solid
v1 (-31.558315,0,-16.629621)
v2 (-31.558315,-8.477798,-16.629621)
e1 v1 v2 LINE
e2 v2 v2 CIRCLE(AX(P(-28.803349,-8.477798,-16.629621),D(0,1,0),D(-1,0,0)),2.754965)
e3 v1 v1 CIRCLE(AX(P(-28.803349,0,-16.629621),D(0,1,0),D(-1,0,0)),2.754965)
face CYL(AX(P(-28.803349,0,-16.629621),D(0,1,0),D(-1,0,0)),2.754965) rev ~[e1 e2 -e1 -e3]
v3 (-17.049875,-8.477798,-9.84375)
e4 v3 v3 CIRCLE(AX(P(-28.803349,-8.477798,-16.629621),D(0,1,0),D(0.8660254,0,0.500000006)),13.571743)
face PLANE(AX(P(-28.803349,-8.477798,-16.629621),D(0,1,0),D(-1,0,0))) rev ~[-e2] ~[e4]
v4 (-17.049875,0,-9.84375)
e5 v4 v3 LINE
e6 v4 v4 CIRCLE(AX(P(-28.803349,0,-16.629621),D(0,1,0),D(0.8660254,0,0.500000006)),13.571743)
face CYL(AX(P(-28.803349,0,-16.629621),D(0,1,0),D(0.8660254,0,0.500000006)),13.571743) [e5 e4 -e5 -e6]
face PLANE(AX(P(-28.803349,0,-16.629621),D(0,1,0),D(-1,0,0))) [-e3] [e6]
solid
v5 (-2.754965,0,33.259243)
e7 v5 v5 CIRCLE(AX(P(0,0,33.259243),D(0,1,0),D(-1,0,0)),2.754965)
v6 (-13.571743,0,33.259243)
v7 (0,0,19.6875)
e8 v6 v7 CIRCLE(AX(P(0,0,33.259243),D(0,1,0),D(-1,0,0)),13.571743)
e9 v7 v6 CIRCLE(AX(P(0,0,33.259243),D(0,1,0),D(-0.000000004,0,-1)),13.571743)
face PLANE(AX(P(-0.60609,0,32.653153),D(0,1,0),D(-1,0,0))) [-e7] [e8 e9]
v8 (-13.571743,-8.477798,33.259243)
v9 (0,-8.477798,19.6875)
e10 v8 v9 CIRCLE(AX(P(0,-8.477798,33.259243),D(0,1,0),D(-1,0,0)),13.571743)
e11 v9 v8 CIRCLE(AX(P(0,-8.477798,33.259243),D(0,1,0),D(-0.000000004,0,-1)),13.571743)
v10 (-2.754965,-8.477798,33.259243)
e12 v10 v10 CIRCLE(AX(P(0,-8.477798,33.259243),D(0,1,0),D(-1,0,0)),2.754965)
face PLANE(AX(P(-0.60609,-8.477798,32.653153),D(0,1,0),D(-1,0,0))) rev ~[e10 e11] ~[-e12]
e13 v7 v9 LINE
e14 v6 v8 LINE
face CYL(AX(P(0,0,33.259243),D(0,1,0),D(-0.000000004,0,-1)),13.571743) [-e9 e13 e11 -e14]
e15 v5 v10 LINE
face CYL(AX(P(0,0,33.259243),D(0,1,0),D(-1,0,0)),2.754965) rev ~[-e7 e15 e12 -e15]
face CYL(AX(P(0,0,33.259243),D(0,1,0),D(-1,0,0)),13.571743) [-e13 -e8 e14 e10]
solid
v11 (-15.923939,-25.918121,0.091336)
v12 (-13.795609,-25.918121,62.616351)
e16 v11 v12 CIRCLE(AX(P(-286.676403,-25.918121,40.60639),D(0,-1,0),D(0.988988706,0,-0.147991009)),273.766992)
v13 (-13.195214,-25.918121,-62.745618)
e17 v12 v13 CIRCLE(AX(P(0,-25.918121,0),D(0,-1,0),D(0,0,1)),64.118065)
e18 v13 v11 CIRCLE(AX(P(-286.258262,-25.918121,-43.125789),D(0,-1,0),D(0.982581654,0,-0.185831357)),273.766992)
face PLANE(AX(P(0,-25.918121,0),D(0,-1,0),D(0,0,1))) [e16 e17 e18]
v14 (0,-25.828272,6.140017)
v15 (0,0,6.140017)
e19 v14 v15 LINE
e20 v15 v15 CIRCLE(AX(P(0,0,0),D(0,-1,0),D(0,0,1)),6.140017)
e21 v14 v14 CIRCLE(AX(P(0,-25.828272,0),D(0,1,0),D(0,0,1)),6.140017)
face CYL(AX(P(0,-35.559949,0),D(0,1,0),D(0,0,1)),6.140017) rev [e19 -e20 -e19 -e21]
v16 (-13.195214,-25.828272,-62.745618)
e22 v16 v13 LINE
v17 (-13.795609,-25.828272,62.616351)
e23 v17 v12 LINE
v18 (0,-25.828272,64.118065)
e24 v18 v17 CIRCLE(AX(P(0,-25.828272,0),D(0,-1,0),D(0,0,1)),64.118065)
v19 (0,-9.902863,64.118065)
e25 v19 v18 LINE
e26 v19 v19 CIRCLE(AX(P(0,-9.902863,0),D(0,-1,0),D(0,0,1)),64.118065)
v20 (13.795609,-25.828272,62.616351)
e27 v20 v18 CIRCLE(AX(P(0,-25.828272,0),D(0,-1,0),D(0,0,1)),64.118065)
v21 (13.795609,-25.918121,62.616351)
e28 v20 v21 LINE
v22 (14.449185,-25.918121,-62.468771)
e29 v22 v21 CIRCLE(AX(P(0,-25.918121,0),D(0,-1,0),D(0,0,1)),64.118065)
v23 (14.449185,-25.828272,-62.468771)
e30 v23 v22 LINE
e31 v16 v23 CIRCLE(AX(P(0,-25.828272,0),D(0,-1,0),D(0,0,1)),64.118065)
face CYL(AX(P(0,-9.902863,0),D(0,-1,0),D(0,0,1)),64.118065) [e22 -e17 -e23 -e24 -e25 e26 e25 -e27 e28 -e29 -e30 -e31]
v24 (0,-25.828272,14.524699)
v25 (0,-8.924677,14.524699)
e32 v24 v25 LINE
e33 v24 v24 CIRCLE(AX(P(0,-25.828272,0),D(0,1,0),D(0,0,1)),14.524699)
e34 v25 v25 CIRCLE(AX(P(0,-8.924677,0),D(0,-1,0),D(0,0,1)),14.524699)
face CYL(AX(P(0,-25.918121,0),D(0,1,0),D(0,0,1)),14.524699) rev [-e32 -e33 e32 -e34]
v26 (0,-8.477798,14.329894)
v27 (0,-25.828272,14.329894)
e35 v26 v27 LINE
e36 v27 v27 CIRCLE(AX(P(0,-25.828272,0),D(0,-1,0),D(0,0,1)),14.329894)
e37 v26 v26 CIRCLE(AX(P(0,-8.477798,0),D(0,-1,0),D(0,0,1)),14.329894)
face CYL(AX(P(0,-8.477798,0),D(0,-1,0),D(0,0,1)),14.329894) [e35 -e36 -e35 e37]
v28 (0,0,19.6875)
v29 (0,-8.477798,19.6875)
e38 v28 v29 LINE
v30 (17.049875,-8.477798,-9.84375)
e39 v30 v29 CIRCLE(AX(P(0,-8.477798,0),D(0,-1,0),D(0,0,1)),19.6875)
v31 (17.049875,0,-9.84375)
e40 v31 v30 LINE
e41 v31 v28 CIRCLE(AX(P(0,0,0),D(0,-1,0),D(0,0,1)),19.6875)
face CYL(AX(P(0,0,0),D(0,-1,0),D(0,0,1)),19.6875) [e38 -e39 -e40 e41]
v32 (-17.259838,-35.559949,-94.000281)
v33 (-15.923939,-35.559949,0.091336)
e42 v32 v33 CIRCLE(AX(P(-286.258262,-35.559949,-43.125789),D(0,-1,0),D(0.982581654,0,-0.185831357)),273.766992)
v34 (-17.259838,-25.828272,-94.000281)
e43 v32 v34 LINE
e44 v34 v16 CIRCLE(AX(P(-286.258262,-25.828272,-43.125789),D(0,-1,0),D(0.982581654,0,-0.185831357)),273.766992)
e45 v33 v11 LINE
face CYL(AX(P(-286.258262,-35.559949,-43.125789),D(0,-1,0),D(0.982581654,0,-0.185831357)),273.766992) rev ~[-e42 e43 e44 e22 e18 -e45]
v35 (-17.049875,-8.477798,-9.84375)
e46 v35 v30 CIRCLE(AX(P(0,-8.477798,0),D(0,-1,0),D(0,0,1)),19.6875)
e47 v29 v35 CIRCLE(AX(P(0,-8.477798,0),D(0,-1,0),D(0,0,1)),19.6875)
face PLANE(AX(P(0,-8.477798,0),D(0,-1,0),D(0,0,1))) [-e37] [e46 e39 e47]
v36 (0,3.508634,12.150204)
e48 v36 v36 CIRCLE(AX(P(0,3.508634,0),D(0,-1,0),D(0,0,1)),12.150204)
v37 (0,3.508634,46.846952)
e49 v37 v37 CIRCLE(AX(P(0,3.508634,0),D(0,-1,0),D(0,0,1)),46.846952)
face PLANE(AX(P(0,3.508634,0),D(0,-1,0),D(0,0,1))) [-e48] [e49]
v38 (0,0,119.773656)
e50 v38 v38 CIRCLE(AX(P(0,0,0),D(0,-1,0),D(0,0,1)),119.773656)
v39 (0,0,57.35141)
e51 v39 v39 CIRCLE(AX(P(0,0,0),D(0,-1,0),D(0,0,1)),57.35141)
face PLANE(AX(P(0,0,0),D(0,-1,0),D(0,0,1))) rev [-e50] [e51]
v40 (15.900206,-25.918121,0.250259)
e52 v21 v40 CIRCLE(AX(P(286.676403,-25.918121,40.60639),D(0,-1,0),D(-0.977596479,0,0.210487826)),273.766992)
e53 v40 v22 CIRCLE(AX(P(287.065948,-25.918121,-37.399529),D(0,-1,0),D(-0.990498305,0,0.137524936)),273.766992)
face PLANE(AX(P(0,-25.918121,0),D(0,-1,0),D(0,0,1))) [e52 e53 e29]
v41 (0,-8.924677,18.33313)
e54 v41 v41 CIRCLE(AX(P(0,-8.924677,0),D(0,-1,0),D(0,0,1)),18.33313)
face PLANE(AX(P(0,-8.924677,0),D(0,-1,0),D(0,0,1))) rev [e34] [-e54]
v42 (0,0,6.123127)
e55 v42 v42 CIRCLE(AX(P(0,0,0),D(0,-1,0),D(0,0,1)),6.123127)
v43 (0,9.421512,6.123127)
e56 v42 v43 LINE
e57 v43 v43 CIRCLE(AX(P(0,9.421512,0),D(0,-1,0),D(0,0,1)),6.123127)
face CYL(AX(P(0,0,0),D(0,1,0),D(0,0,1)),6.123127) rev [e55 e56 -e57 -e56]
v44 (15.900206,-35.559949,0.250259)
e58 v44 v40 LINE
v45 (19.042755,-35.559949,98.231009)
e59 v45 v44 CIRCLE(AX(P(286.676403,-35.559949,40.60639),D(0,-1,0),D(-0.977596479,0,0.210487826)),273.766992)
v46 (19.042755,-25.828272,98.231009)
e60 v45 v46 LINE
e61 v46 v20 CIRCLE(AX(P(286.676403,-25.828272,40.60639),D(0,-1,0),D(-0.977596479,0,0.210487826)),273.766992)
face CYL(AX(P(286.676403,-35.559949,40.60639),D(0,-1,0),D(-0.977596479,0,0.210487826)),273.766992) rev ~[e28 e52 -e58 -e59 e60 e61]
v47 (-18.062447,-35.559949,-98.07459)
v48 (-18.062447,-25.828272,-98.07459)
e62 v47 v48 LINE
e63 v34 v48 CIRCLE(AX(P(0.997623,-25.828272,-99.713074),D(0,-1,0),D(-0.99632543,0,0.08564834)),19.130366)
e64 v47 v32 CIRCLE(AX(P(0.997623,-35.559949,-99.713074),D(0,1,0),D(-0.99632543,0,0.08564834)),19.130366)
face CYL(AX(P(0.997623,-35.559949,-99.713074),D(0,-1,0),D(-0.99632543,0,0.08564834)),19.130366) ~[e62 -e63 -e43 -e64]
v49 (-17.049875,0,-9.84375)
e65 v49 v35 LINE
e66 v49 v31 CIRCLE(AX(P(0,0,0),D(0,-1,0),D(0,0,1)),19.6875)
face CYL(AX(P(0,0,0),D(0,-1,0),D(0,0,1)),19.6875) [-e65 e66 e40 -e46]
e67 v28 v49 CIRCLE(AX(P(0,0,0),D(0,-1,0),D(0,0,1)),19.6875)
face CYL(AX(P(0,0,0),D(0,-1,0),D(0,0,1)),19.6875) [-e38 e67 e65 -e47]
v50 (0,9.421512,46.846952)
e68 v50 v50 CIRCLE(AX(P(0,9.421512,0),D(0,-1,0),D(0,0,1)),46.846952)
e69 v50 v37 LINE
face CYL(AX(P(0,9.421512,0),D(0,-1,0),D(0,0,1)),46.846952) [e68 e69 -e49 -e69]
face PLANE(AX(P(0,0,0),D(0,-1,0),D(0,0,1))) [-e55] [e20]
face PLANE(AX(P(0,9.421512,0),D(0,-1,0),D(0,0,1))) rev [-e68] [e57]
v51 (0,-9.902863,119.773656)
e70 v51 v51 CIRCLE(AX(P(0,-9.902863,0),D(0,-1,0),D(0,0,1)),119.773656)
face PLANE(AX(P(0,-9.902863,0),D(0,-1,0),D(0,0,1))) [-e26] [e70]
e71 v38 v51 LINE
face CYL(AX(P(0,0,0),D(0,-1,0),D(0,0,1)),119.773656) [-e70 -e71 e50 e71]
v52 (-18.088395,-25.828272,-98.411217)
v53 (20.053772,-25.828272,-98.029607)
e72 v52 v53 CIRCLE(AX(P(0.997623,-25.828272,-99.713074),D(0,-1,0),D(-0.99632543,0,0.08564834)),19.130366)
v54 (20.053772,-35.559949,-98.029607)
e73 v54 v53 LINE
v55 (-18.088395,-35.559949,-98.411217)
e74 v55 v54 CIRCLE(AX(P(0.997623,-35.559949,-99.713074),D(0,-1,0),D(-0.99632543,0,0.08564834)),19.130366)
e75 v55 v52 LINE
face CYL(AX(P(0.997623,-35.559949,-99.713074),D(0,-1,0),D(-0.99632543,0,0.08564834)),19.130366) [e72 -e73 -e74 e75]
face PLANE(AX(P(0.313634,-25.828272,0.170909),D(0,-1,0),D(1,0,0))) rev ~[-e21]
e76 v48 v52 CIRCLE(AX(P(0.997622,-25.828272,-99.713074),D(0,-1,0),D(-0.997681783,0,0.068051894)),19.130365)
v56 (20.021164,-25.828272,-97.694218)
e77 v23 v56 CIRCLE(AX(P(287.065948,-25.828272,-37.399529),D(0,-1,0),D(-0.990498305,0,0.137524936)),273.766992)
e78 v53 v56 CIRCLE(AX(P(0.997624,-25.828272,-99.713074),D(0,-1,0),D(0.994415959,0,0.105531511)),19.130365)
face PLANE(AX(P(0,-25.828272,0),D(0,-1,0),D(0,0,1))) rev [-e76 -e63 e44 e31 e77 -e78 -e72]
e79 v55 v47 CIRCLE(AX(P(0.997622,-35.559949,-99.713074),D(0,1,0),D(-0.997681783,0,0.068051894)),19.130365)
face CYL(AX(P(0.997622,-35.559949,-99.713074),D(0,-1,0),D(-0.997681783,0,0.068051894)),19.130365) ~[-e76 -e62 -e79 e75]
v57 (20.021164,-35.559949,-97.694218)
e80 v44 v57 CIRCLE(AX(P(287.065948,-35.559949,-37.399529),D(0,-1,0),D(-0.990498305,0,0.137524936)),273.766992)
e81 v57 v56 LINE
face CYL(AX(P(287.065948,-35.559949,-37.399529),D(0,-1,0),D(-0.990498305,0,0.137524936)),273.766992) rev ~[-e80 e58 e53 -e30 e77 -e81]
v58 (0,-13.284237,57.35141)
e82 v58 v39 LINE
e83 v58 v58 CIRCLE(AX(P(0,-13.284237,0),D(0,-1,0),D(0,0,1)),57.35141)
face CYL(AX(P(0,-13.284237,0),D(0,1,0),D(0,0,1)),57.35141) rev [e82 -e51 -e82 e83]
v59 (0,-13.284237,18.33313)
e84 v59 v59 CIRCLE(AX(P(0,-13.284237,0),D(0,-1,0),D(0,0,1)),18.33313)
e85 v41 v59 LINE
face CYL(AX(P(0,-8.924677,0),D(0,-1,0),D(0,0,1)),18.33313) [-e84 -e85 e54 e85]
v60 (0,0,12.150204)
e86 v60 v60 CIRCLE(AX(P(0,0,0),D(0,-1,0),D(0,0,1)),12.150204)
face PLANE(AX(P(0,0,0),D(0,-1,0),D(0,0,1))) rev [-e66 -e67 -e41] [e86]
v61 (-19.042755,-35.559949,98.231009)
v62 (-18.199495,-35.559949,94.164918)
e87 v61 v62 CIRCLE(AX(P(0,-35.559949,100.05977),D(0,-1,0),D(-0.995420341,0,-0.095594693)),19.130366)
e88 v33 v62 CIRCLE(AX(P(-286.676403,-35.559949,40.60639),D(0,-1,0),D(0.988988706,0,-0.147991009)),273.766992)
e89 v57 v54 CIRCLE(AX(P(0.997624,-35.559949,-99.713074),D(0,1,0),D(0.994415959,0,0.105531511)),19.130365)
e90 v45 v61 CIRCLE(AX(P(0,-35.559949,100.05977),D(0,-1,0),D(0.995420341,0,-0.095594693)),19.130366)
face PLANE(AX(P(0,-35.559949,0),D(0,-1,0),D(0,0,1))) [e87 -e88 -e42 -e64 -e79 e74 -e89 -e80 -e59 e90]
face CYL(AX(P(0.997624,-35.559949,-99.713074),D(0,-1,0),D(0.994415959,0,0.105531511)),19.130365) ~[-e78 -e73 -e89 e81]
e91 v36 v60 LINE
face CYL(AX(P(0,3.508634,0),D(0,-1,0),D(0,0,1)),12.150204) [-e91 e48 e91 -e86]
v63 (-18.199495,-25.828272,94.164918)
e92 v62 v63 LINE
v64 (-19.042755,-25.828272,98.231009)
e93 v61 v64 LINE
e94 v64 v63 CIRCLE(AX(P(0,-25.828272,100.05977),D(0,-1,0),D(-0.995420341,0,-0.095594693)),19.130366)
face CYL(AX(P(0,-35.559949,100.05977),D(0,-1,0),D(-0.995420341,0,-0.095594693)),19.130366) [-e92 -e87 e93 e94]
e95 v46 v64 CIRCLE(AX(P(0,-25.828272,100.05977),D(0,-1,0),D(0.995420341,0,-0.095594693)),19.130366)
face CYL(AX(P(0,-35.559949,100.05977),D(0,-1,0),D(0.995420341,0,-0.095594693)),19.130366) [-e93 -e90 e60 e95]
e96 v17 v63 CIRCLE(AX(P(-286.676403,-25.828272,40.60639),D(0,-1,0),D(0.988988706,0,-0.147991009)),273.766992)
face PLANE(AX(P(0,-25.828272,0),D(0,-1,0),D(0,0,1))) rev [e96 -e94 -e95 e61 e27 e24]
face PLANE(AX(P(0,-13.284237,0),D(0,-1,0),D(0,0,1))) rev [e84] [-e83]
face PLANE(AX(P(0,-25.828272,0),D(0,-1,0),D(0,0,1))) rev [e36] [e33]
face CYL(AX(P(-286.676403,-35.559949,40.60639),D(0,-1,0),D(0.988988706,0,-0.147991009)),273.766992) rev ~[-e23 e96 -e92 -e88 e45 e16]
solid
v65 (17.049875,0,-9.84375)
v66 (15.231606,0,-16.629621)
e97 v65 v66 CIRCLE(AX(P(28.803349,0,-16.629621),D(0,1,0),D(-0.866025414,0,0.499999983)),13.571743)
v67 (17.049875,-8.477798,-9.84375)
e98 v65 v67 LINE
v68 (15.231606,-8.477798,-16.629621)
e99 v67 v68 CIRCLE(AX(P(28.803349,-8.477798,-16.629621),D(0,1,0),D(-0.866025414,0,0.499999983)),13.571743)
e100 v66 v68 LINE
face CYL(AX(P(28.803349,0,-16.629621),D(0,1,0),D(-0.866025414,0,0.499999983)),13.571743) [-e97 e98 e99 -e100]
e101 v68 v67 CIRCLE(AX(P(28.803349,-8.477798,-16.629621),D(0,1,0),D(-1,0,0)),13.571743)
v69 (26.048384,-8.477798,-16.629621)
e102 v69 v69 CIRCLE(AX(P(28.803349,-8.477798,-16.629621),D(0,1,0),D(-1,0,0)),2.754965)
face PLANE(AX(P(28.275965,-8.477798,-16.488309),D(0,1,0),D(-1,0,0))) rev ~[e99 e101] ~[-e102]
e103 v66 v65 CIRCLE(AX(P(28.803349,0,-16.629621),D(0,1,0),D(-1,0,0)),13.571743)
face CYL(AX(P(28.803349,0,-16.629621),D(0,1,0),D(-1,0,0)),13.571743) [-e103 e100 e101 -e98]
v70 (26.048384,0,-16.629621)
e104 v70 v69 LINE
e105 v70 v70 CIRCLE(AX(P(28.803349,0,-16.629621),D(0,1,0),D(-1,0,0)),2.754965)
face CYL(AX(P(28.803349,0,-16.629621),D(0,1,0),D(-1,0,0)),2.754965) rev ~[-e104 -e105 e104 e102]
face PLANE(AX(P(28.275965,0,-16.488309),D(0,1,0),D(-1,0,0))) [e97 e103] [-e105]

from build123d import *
from build123d import SkipClean  # not in build123d's __all__

# Parameters (mm, degrees)
F3_DEPTH = 25
F4_DEPTH = 9.7316764295
F5_R     = 2.7549652458
F6_DEPTH = 8.4777977318


with BuildPart() as f1:
    # F0 (on Right) → F1 (revolve)
    with BuildSketch(Plane.YZ):
        Polygon((0, 6.1400169507), (0, 8.2560488954), (0, 19.687499851), (-8.4777977318, 19.687499851), (-8.4777977318, 14.3298944458), (-25.8282721043, 14.3298944458), (-25.8282721043, 100.0597700477), (-35.5599485338, 100.0597700477), (-35.5599485338, 6.1400169507), align=None)
    revolve(axis=Axis((0, -24.406015873, 0), (0, -1, 0)))

    # F2 (on face) → F3 (cut)
    with BuildSketch(Plane.XZ.offset(35.5599485338)):
        with BuildLine():
            ThreePointArc((100.0597700477, 0), (77.1925232945, 63.6653118222), (19.0427553675, 98.2310085971))
            ThreePointArc((19.0427553675, 98.2310085971), (13.0501122552, 49.3824410014), (15.9002061052, 0.2502591582))
            ThreePointArc((15.9002061052, 0.2502591582), (13.5409533991, -48.9079370484), (20.0211640805, -97.6942178777))
            ThreePointArc((20.0211640805, -97.6942178777), (20.0382067589, -97.8618404932), (20.0537724887, -98.0296067062))
            ThreePointArc((20.0537724887, -98.0296067062), (77.5194602851, -63.2668227359), (100.0597700477, 0))
        make_face()
        with BuildLine():
            ThreePointArc((-18.1994950958, 94.1649181676), (-18.6134156028, 96.1995622705), (-19.0427553675, 98.2310085971))
            ThreePointArc((-19.0427553675, 98.2310085971), (-18.7317798871, 96.1750148827), (-18.1994950958, 94.1649181676))
        make_face()
        with BuildLine():
            ThreePointArc((-18.1994950958, 94.1649181676), (-18.7317798871, 96.1750148827), (-19.0427553675, 98.2310085971))
            ThreePointArc((-19.0427553675, 98.2310085971), (-100.058591646, -0.4856128205), (-18.0883946868, -98.4112166353))
            ThreePointArc((-18.0883946868, -98.4112166353), (-18.0761635611, -98.2428461722), (-18.0624471565, -98.0745901959))
            ThreePointArc((-18.0624471565, -98.0745901959), (-17.7720210603, -96.0155932105), (-17.2598383027, -94.0002806477))
            ThreePointArc((-17.2598383027, -94.0002806477), (-12.518858774, -47.0123005144), (-15.9239394561, 0.0913361759))
            ThreePointArc((-15.9239394561, 0.0913361759), (-12.9894678609, 47.2266312356), (-18.1994950958, 94.1649181676))
        make_face()
    extrude(amount=-F3_DEPTH, mode=Mode.SUBTRACT)

    # F2 (on face) → F4 (join, through all)
    with BuildSketch(Plane.XZ.offset(35.5599485338)):
        with BuildLine():
            ThreePointArc((15.9002061052, 0.2502591582), (13.0501122552, 49.3824410014), (19.0427553675, 98.2310085971))
            ThreePointArc((19.0427553675, 98.2310085971), (0, 119.1901359728), (-19.0427553675, 98.2310085971))
            ThreePointArc((-19.0427553675, 98.2310085971), (-18.6134156028, 96.1995622705), (-18.1994950958, 94.1649181676))
            ThreePointArc((-18.1994950958, 94.1649181676), (-12.9894678609, 47.2266312356), (-15.9239394561, 0.0913361759))
            ThreePointArc((-15.9239394561, 0.0913361759), (-12.518858774, -47.0123005144), (-17.2598383027, -94.0002806477))
            ThreePointArc((-17.2598383027, -94.0002806477), (-17.6534175167, -96.0389572316), (-18.0624471565, -98.0745901959))
            ThreePointArc((-18.0624471565, -98.0745901959), (1.1886840484, -118.8424860853), (20.0211640805, -97.6942178777))
            ThreePointArc((20.0211640805, -97.6942178777), (13.5409533991, -48.9079370484), (15.9002061052, 0.2502591582))
        make_face()
        with BuildLine():
            ThreePointArc((-18.1994950958, 94.1649181676), (-18.6134156028, 96.1995622705), (-19.0427553675, 98.2310085971))
            ThreePointArc((-19.0427553675, 98.2310085971), (-18.7317798871, 96.1750148827), (-18.1994950958, 94.1649181676))
        make_face()
        with BuildLine():
            ThreePointArc((-17.2598383027, -94.0002806477), (-17.7720210603, -96.0155932105), (-18.0624471565, -98.0745901959))
            ThreePointArc((-18.0624471565, -98.0745901959), (-17.6534175167, -96.0389572316), (-17.2598383027, -94.0002806477))
        make_face()
    with SkipClean():  # cleaning this boolean's faces spoils the solid; the shape is the same uncleaned
        extrude(amount=-F4_DEPTH)

    # F5 (on face) → F6 (join, through all)
    with BuildSketch(Plane(origin=(0, 0, 0), x_dir=(-1, 0, 0), z_dir=(0, 1, 0))):
        with BuildLine():
            ThreePointArc((5.24e-08, 19.687499851), (9.5966715729, 23.662571381), (13.5717430658, 33.2592429167))
            ThreePointArc((13.5717430658, 33.2592429167), (-9.5966715729, 42.8559144525), (5.24e-08, 19.687499851))
        make_face()
        with Locations((0, 33.2592429167)):
            Circle(F5_R, mode=Mode.SUBTRACT)
        with BuildLine():
            ThreePointArc((-15.2316062108, -16.6296214584), (-15.6940521066, -13.1169960083), (-17.0498748728, -9.8437501596))
            ThreePointArc((-17.0498748728, -9.8437501596), (-41.9126464465, -20.1422469085), (-15.2316062108, -16.6296214584))
        make_face()
        with Locations((-28.8033492765, -16.6296214584)):
            Circle(F5_R, mode=Mode.SUBTRACT)
        with BuildLine():
            ThreePointArc((42.3750923423, -16.6296214584), (32.3159749035, -3.5203243358), (17.0498750559, -9.8437498425))
            ThreePointArc((17.0498750559, -9.8437498425), (25.2907236496, -29.7389185809), (42.3750923423, -16.6296214584))
        make_face()
        with Locations((28.8033492765, -16.6296214584)):
            Circle(F5_R, mode=Mode.SUBTRACT)
    extrude(amount=-F6_DEPTH)

    # F7 (on Right) → F8 (revolve)
    with BuildSketch(Plane.YZ):
        Polygon((0, 12.1502038091), (0, 6.1231274158), (9.4215124846, 6.1231274158), (9.4215124846, 46.8469522893), (3.5086337011, 46.8469522893), (3.5086337011, 12.1502038091), align=None)
        Polygon((-25.9181205183, 64.11806494), (-25.9181205183, 21.7532776296), (-25.9181205183, 14.5246991888), (-8.9246770367, 14.5246991888), (-8.9246770367, 18.3331295848), (-13.284237124, 18.3331295848), (-13.284237124, 57.3514103889), (0, 57.3514103889), (0, 119.7736561298), (-9.902862832, 119.7736561298), (-9.902862832, 64.11806494), align=None)
    revolve(axis=Axis((0, -24.5498530567, 0), (0, -1, 0)))


solid = f1.part
